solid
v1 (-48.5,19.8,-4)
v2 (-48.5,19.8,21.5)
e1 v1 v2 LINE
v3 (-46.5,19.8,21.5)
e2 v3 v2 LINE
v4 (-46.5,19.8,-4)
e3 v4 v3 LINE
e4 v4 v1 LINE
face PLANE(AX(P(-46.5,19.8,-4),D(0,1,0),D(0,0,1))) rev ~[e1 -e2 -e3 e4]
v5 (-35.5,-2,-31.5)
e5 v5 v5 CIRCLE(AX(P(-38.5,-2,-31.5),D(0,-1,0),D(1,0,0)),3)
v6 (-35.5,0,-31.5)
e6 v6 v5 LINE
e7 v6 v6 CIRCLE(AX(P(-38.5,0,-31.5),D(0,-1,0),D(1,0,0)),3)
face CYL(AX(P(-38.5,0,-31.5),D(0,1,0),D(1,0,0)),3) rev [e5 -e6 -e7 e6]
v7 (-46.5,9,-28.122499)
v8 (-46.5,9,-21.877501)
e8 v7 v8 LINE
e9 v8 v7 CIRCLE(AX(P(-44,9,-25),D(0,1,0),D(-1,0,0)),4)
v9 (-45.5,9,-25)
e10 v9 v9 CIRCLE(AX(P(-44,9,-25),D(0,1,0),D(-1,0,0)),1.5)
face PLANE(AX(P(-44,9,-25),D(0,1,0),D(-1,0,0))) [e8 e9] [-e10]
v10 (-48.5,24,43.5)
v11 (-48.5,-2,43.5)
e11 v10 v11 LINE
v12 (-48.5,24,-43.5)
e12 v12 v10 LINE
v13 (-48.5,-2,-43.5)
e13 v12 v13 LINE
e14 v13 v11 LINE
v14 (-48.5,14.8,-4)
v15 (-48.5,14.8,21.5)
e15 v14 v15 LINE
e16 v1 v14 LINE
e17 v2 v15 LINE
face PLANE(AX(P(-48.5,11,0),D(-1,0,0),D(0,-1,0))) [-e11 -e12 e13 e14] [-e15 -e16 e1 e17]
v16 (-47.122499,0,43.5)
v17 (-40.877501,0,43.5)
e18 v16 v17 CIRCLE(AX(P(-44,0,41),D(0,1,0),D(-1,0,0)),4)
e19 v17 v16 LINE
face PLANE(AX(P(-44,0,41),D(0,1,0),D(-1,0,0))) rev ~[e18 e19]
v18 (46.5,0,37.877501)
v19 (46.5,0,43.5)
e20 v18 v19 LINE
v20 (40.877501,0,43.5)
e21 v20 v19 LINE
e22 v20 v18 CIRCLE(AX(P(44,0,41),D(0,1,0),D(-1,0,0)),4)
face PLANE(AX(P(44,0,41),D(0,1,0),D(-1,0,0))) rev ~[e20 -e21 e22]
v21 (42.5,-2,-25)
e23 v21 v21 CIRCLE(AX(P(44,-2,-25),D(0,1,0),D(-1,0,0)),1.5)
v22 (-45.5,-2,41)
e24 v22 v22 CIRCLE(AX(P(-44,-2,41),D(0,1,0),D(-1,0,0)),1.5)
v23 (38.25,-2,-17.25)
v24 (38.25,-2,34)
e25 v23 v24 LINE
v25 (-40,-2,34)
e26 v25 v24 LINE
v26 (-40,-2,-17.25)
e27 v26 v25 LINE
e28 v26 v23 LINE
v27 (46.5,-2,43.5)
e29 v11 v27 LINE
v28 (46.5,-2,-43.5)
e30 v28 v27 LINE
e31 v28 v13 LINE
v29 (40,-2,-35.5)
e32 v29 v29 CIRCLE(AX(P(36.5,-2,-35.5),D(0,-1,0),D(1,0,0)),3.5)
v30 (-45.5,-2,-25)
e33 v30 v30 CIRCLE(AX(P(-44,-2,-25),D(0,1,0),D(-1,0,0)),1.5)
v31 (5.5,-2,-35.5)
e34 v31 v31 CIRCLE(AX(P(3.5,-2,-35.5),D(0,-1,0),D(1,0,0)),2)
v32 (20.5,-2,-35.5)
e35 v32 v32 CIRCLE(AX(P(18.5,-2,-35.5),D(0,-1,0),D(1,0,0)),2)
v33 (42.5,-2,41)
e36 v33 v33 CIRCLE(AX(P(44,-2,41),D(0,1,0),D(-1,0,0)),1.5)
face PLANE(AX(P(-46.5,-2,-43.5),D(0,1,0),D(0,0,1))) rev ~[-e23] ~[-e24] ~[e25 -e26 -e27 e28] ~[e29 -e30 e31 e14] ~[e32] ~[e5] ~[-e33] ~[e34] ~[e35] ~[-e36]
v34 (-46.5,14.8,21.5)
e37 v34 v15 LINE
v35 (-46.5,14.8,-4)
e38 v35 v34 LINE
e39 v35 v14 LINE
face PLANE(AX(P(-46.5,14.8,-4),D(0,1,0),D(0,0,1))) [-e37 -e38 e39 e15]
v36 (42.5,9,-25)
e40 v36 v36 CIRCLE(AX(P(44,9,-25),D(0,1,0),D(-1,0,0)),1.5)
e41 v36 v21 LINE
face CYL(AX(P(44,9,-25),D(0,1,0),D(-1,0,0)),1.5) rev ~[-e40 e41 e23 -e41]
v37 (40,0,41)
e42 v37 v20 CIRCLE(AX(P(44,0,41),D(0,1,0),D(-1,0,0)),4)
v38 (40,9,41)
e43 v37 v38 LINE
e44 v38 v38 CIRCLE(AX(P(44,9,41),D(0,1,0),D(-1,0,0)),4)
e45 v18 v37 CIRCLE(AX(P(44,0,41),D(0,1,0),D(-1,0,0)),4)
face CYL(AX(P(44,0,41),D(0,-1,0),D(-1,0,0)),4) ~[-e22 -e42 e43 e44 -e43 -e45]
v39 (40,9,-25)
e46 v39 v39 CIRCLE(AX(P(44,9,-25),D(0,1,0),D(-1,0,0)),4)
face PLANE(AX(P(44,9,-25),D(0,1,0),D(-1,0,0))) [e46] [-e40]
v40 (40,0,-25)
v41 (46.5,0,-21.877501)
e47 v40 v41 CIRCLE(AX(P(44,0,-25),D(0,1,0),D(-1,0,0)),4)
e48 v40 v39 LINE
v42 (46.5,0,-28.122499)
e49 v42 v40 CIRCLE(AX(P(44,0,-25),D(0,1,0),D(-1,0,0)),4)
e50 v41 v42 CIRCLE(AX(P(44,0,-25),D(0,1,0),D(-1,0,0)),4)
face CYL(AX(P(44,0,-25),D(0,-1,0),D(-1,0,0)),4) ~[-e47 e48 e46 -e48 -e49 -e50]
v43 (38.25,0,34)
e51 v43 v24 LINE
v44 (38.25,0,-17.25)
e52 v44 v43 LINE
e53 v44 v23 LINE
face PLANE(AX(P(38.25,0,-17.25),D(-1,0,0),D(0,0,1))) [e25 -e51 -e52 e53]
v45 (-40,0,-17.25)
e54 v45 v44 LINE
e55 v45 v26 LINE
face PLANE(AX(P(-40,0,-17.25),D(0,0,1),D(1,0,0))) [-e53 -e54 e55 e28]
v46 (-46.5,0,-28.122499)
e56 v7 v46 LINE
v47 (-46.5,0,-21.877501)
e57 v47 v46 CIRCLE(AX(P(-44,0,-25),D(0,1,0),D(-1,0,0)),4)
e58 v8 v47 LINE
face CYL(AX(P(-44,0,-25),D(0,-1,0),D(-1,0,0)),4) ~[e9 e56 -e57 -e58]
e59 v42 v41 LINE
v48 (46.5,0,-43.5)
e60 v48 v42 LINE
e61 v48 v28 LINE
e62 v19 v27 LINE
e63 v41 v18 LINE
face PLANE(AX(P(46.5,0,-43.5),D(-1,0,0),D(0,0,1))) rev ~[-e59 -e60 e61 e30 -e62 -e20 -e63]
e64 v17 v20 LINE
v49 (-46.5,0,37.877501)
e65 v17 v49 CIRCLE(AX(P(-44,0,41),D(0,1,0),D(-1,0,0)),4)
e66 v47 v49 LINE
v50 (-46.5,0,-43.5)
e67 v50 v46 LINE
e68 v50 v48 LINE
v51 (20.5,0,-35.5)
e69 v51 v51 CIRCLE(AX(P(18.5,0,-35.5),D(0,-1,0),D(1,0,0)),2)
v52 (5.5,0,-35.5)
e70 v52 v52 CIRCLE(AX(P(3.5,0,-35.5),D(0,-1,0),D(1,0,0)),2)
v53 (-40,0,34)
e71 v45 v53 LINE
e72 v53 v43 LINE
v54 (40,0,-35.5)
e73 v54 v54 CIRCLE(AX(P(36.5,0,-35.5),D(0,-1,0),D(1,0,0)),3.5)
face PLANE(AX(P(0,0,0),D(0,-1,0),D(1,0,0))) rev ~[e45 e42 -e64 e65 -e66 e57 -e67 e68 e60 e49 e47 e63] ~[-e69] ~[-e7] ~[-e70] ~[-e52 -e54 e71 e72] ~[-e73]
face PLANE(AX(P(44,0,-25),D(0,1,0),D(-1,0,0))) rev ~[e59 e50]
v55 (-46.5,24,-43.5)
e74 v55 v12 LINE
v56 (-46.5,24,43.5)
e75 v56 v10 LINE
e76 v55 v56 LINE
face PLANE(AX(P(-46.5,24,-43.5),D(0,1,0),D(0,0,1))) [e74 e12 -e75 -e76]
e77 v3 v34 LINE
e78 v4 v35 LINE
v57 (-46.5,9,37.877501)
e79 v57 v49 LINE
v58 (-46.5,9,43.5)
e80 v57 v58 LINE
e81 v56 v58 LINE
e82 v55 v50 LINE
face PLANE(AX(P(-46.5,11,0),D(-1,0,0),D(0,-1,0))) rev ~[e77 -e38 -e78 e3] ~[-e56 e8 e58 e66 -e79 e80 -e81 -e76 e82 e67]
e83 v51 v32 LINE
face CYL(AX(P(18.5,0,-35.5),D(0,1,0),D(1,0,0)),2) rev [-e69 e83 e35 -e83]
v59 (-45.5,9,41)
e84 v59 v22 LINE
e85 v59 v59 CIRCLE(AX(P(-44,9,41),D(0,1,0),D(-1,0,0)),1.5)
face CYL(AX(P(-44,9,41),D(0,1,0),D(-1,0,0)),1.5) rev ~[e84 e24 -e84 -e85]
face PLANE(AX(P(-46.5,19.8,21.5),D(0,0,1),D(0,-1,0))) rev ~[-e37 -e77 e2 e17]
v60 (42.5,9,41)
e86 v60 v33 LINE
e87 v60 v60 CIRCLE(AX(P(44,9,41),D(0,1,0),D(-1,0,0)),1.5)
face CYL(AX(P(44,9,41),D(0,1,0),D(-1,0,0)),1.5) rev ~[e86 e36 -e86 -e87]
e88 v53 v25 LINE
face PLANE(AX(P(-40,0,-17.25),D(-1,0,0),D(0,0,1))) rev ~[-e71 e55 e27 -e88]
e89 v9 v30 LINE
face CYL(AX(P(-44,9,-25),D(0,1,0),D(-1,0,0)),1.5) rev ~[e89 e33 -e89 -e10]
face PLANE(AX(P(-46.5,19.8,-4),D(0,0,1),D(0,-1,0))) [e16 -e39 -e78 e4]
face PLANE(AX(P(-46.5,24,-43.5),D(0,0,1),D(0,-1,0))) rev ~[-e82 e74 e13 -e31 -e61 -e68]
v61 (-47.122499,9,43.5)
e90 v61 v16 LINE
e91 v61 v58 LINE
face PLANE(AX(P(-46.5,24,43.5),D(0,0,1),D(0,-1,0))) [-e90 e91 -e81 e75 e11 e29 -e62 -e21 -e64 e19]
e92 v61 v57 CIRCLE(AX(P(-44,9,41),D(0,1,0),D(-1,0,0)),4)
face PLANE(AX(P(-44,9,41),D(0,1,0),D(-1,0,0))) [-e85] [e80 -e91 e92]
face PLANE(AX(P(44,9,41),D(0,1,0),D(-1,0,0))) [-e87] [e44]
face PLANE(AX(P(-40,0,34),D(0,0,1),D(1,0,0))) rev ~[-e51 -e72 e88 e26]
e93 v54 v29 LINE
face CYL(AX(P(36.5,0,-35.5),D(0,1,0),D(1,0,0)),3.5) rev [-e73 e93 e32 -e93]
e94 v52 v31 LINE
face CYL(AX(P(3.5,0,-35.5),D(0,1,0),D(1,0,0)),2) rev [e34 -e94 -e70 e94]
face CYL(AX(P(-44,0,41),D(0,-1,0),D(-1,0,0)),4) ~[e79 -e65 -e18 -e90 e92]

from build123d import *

# Parameters (mm, degrees)
F0_W     = 93
F0_H     = 87
F0_R     = 3
F0_R_2   = 2
F0_R_3   = 3.5
F0_W_2   = 78.25
F0_H_2   = 51.25
F1_DEPTH = 2
F2_R     = 4
F3_DEPTH = 9
F4_R     = 1.5
F5_DEPTH = 25
F6_W     = 26
F6_H     = 87
F6_W_2   = 5
F6_H_2   = 25.5
F7_DEPTH = 2


# Not quite as in the source:
# - a feature of the source that left no trace in its solid (it failed there, or was rolled back) is left out


with BuildPart() as f1:
    # F0 (on Front) → F1 (new body)
    with BuildSketch(Plane.XZ):
        Rectangle(F0_W, F0_H)
        with Locations((-38.5, -31.5)):
            Circle(F0_R, mode=Mode.SUBTRACT)
        with Locations((3.5, -35.5)):
            Circle(F0_R_2, mode=Mode.SUBTRACT)
        with Locations((18.5, -35.5)):
            Circle(F0_R_2, mode=Mode.SUBTRACT)
        with Locations((36.5, -35.5)):
            Circle(F0_R_3, mode=Mode.SUBTRACT)
        with Locations((-0.875, 8.375)):
            Rectangle(F0_W_2, F0_H_2, mode=Mode.SUBTRACT)
    extrude(amount=F1_DEPTH)

    # F2 (on face) → F3 (join)
    with BuildSketch(Plane(origin=(0, 0, 0), x_dir=(-1, 0, 0), z_dir=(0, 1, 0))):
        with Locations((-44, 41)):
            Circle(F2_R)
        with Locations((44, 41)):
            Circle(F2_R)
        with Locations((44, -25)):
            Circle(F2_R)
        with Locations((-44, -25)):
            Circle(F2_R)
    extrude(amount=F3_DEPTH)

    # F4 (on face) → F5 (cut)
    with BuildSketch(Plane(origin=(0, 9, 0), x_dir=(-1, 0, 0), z_dir=(0, 1, 0))):
        with Locations((-44, 41)):
            Circle(F4_R)
        with Locations((44, 41)):
            Circle(F4_R)
        with Locations((44, -25)):
            Circle(F4_R)
        with Locations((-44, -25)):
            Circle(F4_R)
    extrude(amount=-F5_DEPTH, mode=Mode.SUBTRACT)

    # F6 (on face) → F7 (join)
    with BuildSketch(Plane(origin=(-46.5, 0, 0), x_dir=(0, -1, 0), z_dir=(-1, 0, 0))):
        with Locations((-11, 0)):
            Rectangle(F6_W, F6_H)
        with Locations((-17.3, 8.75)):
            Rectangle(F6_W_2, F6_H_2, mode=Mode.SUBTRACT)
    extrude(amount=F7_DEPTH)


solid = f1.part
